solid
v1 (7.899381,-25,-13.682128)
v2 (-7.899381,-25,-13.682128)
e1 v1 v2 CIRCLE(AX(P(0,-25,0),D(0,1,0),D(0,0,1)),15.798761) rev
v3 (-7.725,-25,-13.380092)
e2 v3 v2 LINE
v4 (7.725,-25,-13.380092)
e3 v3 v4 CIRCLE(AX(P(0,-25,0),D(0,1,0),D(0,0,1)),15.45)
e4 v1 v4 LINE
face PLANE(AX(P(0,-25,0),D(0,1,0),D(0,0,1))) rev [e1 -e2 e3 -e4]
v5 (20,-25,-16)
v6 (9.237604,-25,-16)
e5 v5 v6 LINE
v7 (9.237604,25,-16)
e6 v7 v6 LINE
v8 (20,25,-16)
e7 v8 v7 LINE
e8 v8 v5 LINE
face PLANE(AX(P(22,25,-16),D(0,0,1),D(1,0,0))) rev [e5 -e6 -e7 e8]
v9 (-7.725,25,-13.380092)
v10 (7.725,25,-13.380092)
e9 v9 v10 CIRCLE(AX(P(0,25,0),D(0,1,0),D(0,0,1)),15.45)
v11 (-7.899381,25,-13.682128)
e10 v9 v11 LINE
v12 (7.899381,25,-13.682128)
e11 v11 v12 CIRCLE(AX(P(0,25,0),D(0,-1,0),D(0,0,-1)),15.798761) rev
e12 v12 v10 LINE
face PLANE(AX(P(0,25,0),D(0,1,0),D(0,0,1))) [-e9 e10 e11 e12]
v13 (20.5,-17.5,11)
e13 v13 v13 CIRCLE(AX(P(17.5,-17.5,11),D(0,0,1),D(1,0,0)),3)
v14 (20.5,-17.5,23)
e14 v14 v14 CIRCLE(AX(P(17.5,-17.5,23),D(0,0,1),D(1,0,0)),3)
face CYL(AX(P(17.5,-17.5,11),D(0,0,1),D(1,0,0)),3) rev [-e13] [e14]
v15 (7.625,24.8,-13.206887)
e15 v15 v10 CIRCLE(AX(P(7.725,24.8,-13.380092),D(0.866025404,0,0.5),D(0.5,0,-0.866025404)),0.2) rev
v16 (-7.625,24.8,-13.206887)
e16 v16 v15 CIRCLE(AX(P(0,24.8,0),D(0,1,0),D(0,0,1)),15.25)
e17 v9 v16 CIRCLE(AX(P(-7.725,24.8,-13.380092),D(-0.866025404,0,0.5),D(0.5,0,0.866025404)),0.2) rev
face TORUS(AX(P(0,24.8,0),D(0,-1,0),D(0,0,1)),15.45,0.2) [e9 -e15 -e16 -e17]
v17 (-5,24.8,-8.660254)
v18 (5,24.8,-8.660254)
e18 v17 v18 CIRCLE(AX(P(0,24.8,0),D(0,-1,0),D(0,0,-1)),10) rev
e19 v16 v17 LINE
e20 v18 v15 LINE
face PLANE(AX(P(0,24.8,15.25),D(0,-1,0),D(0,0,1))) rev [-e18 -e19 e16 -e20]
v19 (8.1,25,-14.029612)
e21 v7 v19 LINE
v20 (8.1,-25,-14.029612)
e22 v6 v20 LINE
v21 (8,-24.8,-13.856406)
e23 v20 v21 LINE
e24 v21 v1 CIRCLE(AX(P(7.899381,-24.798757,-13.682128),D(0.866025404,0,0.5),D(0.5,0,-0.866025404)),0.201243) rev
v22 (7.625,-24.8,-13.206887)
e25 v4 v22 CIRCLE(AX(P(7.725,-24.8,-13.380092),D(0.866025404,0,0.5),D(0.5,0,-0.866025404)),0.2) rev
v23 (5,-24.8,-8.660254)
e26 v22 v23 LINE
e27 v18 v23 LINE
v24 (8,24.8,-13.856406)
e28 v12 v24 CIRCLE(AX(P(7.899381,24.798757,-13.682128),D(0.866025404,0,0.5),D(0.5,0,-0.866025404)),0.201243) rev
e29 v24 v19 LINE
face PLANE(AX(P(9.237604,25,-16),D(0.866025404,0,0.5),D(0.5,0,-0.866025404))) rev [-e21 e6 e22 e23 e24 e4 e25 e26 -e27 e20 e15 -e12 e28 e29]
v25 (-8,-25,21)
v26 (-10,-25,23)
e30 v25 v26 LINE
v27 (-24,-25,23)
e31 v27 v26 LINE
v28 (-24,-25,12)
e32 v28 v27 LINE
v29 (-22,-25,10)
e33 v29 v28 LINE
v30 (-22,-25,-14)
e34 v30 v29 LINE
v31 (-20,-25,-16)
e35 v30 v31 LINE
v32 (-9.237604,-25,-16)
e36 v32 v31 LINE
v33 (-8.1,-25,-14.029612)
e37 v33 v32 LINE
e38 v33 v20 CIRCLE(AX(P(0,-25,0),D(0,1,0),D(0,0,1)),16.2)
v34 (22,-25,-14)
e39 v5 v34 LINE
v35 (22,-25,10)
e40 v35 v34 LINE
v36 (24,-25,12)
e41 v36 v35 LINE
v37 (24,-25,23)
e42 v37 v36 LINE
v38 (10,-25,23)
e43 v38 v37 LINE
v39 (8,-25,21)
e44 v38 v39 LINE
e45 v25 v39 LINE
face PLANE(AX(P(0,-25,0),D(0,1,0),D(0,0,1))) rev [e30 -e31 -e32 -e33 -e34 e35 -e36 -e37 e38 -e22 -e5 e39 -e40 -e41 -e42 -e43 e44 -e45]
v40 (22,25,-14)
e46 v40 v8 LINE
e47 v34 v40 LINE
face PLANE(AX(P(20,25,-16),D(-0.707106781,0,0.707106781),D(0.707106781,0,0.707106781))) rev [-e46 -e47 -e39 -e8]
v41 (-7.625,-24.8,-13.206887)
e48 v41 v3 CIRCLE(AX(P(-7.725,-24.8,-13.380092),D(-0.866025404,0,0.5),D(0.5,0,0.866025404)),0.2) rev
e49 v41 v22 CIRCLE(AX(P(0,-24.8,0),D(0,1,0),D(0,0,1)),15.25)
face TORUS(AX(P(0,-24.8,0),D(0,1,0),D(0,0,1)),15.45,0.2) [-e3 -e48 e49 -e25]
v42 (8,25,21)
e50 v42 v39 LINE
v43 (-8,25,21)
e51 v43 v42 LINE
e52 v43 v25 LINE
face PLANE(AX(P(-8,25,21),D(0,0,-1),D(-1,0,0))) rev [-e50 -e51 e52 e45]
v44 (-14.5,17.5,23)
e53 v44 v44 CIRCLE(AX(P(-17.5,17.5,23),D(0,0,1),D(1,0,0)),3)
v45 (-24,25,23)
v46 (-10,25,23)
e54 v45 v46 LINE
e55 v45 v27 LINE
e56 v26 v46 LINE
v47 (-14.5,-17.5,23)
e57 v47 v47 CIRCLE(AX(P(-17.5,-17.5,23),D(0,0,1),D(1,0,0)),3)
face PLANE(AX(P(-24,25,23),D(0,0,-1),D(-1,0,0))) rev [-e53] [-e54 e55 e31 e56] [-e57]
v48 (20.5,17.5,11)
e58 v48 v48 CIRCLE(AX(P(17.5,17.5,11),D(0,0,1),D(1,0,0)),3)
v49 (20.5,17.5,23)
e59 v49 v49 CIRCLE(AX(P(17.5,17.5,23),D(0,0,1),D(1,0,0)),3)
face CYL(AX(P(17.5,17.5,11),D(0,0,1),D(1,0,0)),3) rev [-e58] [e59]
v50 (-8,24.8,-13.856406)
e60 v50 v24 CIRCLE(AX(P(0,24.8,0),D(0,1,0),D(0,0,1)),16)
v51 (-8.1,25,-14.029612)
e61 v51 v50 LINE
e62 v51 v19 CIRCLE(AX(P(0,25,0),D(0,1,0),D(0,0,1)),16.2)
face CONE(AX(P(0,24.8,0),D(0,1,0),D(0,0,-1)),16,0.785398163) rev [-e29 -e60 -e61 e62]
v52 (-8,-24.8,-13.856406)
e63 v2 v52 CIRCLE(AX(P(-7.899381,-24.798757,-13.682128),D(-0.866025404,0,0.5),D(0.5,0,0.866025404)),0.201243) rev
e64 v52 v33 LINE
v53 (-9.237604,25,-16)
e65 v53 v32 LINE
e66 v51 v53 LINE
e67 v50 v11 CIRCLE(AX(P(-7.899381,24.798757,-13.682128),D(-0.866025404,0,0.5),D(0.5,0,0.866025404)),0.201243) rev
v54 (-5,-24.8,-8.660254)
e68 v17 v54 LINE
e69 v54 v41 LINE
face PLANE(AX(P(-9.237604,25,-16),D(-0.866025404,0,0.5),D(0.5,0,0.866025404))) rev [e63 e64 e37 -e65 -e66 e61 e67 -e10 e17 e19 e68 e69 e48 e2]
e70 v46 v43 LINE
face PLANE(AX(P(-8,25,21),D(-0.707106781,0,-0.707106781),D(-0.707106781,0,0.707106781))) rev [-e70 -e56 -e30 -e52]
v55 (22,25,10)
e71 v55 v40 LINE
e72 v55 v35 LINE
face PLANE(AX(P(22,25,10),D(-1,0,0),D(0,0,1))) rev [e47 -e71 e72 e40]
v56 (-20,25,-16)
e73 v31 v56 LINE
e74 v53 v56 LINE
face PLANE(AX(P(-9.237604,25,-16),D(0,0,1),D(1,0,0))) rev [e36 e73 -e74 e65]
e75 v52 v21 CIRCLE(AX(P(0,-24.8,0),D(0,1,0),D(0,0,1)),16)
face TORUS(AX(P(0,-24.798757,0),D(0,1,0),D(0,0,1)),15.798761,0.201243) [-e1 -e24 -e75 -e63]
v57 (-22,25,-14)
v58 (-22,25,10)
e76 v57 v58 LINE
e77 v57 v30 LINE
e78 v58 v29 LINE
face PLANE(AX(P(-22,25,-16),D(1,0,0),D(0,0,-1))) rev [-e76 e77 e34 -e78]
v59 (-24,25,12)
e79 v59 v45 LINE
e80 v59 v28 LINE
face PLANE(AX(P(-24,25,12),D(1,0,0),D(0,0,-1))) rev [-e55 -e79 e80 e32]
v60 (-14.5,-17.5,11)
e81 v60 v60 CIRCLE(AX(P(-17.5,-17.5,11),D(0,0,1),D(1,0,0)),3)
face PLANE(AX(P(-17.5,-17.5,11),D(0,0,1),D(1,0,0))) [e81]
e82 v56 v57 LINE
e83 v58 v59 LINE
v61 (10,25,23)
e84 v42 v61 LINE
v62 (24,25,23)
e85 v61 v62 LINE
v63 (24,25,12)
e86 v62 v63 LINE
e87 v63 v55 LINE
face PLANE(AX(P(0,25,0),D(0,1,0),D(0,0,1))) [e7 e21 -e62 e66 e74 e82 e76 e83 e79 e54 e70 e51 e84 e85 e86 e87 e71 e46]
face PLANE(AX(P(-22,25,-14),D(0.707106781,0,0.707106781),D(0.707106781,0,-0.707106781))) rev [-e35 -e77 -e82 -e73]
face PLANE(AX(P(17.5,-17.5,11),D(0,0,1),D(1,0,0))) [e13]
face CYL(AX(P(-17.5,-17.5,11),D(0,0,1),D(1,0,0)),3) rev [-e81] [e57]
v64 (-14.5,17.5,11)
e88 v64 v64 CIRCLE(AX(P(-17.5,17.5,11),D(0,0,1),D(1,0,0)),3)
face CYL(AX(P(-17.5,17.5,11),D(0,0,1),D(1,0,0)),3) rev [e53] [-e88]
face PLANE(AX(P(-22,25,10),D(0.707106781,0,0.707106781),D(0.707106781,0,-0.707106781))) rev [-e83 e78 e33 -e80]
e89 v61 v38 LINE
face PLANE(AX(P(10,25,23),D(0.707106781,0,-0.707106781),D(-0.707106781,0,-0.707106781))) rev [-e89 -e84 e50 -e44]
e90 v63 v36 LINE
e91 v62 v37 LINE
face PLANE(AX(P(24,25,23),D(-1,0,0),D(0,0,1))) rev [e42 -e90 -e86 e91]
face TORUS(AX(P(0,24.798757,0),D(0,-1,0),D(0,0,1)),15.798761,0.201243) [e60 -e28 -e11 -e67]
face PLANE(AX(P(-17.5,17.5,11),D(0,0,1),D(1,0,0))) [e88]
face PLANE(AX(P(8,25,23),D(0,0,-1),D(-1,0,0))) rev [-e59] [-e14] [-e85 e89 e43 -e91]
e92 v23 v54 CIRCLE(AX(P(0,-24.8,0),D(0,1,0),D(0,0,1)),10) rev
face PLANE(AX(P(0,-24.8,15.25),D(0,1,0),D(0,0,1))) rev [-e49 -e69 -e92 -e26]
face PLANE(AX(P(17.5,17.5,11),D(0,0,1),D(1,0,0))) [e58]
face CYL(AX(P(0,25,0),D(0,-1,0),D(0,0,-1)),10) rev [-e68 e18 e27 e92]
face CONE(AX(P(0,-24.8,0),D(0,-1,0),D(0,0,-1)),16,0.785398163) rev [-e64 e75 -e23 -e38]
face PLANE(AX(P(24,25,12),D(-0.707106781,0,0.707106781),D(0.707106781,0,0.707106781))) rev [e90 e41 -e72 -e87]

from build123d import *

# Parameters (mm, degrees)
EXTRUDE_2_DEPTH     = 50
CHAMFER_1_SIZE      = 2
SKETCH_5_R          = 3
CUT_EXTRUDE_1_DEPTH = 12
CHAMFER_2_SIZE      = 2


with BuildPart() as part:
    # 草图4 → 拉伸2 (new body)
    with BuildSketch(Plane(origin=(0, -25, 0), x_dir=(-1, 0, 0), z_dir=(0, 1, 0))):
        with BuildLine():
            Line((8, 21), (-8, 21))
            Line((-8, 21), (-8, 23))
            Line((-8, 23), (-24, 23))
            Line((-24, 23), (-24, 12))
            Line((-24, 12), (-22, 10))
            Line((-22, 10), (-22, -16))
            Line((-22, -16), (-9.237604307, -16))
            Line((-9.237604307, -16), (-5, -8.660254038))
            ThreePointArc((-5, -8.660254038), (0, 10), (5, -8.660254038))
            Line((5, -8.660254038), (9.237604307, -16))
            Line((9.237604307, -16), (22, -16))
            Line((22, -16), (22, 10))
            Line((22, 10), (24, 12))
            Line((24, 12), (24, 23))
            Line((24, 23), (8, 23))
            Line((8, 23), (8, 21))
        make_face()
    extrude(amount=EXTRUDE_2_DEPTH)

    # 倒角1
    chamfer_1_edges = [part.edges().sort_by_distance(p)[0] for p in [
        (-8, 0, 23),
        (8, 0, 23),
    ]]
    chamfer(chamfer_1_edges, length=CHAMFER_1_SIZE - 0.0001)  # a hair under: the kernel refuses the full size

    # 草图5 → 切除-拉伸1 (cut)
    with BuildSketch(Plane.XY.offset(23)):
        with Locations((-17.5, 17.5)):
            Circle(SKETCH_5_R)
        with Locations((17.5, 17.5)):
            Circle(SKETCH_5_R)
        with Locations((17.5, -17.5)):
            Circle(SKETCH_5_R)
        with Locations((-17.5, -17.5)):
            Circle(SKETCH_5_R)
    extrude(amount=-CUT_EXTRUDE_1_DEPTH, mode=Mode.SUBTRACT)

    # 倒角2
    chamfer_2_edges = [part.edges().sort_by_distance(p)[0] for p in [
        (-22, 0, -16),
        (22, 0, -16),
    ]]
    chamfer(chamfer_2_edges, length=CHAMFER_2_SIZE)

    # 草图6 → 切除-旋转1 (revolve, cut)
    with BuildSketch(Plane(origin=(0, 0, 0), x_dir=(0, 0, -1), z_dir=(1, 0, 0))):
        with BuildLine():
            Line((-16.2, -25), (-16, -24.8))
            ThreePointArc((-16, -24.8), (-15.940621125, -24.941496067), (-15.798761062, -25))
            Line((-15.798761062, -25), (-16.2, -25))
        make_face()
        with BuildLine():
            Line((-15.45, -25), (0, -25))
            Line((0, -25), (0, -24.8))
            Line((0, -24.8), (-15.25, -24.8))
            ThreePointArc((-15.25, -24.8), (-15.308578644, -24.941421356), (-15.45, -25))
        make_face()
    cut_revolve_1 = revolve(axis=Axis((0, -10.264906919, 0), (0, -1, 0)), mode=Mode.SUBTRACT)

    # 镜向1: 切除-旋转1 across plane
    add(cut_revolve_1.mirror(Plane.ZX), mode=Mode.SUBTRACT)


solid = part.part
